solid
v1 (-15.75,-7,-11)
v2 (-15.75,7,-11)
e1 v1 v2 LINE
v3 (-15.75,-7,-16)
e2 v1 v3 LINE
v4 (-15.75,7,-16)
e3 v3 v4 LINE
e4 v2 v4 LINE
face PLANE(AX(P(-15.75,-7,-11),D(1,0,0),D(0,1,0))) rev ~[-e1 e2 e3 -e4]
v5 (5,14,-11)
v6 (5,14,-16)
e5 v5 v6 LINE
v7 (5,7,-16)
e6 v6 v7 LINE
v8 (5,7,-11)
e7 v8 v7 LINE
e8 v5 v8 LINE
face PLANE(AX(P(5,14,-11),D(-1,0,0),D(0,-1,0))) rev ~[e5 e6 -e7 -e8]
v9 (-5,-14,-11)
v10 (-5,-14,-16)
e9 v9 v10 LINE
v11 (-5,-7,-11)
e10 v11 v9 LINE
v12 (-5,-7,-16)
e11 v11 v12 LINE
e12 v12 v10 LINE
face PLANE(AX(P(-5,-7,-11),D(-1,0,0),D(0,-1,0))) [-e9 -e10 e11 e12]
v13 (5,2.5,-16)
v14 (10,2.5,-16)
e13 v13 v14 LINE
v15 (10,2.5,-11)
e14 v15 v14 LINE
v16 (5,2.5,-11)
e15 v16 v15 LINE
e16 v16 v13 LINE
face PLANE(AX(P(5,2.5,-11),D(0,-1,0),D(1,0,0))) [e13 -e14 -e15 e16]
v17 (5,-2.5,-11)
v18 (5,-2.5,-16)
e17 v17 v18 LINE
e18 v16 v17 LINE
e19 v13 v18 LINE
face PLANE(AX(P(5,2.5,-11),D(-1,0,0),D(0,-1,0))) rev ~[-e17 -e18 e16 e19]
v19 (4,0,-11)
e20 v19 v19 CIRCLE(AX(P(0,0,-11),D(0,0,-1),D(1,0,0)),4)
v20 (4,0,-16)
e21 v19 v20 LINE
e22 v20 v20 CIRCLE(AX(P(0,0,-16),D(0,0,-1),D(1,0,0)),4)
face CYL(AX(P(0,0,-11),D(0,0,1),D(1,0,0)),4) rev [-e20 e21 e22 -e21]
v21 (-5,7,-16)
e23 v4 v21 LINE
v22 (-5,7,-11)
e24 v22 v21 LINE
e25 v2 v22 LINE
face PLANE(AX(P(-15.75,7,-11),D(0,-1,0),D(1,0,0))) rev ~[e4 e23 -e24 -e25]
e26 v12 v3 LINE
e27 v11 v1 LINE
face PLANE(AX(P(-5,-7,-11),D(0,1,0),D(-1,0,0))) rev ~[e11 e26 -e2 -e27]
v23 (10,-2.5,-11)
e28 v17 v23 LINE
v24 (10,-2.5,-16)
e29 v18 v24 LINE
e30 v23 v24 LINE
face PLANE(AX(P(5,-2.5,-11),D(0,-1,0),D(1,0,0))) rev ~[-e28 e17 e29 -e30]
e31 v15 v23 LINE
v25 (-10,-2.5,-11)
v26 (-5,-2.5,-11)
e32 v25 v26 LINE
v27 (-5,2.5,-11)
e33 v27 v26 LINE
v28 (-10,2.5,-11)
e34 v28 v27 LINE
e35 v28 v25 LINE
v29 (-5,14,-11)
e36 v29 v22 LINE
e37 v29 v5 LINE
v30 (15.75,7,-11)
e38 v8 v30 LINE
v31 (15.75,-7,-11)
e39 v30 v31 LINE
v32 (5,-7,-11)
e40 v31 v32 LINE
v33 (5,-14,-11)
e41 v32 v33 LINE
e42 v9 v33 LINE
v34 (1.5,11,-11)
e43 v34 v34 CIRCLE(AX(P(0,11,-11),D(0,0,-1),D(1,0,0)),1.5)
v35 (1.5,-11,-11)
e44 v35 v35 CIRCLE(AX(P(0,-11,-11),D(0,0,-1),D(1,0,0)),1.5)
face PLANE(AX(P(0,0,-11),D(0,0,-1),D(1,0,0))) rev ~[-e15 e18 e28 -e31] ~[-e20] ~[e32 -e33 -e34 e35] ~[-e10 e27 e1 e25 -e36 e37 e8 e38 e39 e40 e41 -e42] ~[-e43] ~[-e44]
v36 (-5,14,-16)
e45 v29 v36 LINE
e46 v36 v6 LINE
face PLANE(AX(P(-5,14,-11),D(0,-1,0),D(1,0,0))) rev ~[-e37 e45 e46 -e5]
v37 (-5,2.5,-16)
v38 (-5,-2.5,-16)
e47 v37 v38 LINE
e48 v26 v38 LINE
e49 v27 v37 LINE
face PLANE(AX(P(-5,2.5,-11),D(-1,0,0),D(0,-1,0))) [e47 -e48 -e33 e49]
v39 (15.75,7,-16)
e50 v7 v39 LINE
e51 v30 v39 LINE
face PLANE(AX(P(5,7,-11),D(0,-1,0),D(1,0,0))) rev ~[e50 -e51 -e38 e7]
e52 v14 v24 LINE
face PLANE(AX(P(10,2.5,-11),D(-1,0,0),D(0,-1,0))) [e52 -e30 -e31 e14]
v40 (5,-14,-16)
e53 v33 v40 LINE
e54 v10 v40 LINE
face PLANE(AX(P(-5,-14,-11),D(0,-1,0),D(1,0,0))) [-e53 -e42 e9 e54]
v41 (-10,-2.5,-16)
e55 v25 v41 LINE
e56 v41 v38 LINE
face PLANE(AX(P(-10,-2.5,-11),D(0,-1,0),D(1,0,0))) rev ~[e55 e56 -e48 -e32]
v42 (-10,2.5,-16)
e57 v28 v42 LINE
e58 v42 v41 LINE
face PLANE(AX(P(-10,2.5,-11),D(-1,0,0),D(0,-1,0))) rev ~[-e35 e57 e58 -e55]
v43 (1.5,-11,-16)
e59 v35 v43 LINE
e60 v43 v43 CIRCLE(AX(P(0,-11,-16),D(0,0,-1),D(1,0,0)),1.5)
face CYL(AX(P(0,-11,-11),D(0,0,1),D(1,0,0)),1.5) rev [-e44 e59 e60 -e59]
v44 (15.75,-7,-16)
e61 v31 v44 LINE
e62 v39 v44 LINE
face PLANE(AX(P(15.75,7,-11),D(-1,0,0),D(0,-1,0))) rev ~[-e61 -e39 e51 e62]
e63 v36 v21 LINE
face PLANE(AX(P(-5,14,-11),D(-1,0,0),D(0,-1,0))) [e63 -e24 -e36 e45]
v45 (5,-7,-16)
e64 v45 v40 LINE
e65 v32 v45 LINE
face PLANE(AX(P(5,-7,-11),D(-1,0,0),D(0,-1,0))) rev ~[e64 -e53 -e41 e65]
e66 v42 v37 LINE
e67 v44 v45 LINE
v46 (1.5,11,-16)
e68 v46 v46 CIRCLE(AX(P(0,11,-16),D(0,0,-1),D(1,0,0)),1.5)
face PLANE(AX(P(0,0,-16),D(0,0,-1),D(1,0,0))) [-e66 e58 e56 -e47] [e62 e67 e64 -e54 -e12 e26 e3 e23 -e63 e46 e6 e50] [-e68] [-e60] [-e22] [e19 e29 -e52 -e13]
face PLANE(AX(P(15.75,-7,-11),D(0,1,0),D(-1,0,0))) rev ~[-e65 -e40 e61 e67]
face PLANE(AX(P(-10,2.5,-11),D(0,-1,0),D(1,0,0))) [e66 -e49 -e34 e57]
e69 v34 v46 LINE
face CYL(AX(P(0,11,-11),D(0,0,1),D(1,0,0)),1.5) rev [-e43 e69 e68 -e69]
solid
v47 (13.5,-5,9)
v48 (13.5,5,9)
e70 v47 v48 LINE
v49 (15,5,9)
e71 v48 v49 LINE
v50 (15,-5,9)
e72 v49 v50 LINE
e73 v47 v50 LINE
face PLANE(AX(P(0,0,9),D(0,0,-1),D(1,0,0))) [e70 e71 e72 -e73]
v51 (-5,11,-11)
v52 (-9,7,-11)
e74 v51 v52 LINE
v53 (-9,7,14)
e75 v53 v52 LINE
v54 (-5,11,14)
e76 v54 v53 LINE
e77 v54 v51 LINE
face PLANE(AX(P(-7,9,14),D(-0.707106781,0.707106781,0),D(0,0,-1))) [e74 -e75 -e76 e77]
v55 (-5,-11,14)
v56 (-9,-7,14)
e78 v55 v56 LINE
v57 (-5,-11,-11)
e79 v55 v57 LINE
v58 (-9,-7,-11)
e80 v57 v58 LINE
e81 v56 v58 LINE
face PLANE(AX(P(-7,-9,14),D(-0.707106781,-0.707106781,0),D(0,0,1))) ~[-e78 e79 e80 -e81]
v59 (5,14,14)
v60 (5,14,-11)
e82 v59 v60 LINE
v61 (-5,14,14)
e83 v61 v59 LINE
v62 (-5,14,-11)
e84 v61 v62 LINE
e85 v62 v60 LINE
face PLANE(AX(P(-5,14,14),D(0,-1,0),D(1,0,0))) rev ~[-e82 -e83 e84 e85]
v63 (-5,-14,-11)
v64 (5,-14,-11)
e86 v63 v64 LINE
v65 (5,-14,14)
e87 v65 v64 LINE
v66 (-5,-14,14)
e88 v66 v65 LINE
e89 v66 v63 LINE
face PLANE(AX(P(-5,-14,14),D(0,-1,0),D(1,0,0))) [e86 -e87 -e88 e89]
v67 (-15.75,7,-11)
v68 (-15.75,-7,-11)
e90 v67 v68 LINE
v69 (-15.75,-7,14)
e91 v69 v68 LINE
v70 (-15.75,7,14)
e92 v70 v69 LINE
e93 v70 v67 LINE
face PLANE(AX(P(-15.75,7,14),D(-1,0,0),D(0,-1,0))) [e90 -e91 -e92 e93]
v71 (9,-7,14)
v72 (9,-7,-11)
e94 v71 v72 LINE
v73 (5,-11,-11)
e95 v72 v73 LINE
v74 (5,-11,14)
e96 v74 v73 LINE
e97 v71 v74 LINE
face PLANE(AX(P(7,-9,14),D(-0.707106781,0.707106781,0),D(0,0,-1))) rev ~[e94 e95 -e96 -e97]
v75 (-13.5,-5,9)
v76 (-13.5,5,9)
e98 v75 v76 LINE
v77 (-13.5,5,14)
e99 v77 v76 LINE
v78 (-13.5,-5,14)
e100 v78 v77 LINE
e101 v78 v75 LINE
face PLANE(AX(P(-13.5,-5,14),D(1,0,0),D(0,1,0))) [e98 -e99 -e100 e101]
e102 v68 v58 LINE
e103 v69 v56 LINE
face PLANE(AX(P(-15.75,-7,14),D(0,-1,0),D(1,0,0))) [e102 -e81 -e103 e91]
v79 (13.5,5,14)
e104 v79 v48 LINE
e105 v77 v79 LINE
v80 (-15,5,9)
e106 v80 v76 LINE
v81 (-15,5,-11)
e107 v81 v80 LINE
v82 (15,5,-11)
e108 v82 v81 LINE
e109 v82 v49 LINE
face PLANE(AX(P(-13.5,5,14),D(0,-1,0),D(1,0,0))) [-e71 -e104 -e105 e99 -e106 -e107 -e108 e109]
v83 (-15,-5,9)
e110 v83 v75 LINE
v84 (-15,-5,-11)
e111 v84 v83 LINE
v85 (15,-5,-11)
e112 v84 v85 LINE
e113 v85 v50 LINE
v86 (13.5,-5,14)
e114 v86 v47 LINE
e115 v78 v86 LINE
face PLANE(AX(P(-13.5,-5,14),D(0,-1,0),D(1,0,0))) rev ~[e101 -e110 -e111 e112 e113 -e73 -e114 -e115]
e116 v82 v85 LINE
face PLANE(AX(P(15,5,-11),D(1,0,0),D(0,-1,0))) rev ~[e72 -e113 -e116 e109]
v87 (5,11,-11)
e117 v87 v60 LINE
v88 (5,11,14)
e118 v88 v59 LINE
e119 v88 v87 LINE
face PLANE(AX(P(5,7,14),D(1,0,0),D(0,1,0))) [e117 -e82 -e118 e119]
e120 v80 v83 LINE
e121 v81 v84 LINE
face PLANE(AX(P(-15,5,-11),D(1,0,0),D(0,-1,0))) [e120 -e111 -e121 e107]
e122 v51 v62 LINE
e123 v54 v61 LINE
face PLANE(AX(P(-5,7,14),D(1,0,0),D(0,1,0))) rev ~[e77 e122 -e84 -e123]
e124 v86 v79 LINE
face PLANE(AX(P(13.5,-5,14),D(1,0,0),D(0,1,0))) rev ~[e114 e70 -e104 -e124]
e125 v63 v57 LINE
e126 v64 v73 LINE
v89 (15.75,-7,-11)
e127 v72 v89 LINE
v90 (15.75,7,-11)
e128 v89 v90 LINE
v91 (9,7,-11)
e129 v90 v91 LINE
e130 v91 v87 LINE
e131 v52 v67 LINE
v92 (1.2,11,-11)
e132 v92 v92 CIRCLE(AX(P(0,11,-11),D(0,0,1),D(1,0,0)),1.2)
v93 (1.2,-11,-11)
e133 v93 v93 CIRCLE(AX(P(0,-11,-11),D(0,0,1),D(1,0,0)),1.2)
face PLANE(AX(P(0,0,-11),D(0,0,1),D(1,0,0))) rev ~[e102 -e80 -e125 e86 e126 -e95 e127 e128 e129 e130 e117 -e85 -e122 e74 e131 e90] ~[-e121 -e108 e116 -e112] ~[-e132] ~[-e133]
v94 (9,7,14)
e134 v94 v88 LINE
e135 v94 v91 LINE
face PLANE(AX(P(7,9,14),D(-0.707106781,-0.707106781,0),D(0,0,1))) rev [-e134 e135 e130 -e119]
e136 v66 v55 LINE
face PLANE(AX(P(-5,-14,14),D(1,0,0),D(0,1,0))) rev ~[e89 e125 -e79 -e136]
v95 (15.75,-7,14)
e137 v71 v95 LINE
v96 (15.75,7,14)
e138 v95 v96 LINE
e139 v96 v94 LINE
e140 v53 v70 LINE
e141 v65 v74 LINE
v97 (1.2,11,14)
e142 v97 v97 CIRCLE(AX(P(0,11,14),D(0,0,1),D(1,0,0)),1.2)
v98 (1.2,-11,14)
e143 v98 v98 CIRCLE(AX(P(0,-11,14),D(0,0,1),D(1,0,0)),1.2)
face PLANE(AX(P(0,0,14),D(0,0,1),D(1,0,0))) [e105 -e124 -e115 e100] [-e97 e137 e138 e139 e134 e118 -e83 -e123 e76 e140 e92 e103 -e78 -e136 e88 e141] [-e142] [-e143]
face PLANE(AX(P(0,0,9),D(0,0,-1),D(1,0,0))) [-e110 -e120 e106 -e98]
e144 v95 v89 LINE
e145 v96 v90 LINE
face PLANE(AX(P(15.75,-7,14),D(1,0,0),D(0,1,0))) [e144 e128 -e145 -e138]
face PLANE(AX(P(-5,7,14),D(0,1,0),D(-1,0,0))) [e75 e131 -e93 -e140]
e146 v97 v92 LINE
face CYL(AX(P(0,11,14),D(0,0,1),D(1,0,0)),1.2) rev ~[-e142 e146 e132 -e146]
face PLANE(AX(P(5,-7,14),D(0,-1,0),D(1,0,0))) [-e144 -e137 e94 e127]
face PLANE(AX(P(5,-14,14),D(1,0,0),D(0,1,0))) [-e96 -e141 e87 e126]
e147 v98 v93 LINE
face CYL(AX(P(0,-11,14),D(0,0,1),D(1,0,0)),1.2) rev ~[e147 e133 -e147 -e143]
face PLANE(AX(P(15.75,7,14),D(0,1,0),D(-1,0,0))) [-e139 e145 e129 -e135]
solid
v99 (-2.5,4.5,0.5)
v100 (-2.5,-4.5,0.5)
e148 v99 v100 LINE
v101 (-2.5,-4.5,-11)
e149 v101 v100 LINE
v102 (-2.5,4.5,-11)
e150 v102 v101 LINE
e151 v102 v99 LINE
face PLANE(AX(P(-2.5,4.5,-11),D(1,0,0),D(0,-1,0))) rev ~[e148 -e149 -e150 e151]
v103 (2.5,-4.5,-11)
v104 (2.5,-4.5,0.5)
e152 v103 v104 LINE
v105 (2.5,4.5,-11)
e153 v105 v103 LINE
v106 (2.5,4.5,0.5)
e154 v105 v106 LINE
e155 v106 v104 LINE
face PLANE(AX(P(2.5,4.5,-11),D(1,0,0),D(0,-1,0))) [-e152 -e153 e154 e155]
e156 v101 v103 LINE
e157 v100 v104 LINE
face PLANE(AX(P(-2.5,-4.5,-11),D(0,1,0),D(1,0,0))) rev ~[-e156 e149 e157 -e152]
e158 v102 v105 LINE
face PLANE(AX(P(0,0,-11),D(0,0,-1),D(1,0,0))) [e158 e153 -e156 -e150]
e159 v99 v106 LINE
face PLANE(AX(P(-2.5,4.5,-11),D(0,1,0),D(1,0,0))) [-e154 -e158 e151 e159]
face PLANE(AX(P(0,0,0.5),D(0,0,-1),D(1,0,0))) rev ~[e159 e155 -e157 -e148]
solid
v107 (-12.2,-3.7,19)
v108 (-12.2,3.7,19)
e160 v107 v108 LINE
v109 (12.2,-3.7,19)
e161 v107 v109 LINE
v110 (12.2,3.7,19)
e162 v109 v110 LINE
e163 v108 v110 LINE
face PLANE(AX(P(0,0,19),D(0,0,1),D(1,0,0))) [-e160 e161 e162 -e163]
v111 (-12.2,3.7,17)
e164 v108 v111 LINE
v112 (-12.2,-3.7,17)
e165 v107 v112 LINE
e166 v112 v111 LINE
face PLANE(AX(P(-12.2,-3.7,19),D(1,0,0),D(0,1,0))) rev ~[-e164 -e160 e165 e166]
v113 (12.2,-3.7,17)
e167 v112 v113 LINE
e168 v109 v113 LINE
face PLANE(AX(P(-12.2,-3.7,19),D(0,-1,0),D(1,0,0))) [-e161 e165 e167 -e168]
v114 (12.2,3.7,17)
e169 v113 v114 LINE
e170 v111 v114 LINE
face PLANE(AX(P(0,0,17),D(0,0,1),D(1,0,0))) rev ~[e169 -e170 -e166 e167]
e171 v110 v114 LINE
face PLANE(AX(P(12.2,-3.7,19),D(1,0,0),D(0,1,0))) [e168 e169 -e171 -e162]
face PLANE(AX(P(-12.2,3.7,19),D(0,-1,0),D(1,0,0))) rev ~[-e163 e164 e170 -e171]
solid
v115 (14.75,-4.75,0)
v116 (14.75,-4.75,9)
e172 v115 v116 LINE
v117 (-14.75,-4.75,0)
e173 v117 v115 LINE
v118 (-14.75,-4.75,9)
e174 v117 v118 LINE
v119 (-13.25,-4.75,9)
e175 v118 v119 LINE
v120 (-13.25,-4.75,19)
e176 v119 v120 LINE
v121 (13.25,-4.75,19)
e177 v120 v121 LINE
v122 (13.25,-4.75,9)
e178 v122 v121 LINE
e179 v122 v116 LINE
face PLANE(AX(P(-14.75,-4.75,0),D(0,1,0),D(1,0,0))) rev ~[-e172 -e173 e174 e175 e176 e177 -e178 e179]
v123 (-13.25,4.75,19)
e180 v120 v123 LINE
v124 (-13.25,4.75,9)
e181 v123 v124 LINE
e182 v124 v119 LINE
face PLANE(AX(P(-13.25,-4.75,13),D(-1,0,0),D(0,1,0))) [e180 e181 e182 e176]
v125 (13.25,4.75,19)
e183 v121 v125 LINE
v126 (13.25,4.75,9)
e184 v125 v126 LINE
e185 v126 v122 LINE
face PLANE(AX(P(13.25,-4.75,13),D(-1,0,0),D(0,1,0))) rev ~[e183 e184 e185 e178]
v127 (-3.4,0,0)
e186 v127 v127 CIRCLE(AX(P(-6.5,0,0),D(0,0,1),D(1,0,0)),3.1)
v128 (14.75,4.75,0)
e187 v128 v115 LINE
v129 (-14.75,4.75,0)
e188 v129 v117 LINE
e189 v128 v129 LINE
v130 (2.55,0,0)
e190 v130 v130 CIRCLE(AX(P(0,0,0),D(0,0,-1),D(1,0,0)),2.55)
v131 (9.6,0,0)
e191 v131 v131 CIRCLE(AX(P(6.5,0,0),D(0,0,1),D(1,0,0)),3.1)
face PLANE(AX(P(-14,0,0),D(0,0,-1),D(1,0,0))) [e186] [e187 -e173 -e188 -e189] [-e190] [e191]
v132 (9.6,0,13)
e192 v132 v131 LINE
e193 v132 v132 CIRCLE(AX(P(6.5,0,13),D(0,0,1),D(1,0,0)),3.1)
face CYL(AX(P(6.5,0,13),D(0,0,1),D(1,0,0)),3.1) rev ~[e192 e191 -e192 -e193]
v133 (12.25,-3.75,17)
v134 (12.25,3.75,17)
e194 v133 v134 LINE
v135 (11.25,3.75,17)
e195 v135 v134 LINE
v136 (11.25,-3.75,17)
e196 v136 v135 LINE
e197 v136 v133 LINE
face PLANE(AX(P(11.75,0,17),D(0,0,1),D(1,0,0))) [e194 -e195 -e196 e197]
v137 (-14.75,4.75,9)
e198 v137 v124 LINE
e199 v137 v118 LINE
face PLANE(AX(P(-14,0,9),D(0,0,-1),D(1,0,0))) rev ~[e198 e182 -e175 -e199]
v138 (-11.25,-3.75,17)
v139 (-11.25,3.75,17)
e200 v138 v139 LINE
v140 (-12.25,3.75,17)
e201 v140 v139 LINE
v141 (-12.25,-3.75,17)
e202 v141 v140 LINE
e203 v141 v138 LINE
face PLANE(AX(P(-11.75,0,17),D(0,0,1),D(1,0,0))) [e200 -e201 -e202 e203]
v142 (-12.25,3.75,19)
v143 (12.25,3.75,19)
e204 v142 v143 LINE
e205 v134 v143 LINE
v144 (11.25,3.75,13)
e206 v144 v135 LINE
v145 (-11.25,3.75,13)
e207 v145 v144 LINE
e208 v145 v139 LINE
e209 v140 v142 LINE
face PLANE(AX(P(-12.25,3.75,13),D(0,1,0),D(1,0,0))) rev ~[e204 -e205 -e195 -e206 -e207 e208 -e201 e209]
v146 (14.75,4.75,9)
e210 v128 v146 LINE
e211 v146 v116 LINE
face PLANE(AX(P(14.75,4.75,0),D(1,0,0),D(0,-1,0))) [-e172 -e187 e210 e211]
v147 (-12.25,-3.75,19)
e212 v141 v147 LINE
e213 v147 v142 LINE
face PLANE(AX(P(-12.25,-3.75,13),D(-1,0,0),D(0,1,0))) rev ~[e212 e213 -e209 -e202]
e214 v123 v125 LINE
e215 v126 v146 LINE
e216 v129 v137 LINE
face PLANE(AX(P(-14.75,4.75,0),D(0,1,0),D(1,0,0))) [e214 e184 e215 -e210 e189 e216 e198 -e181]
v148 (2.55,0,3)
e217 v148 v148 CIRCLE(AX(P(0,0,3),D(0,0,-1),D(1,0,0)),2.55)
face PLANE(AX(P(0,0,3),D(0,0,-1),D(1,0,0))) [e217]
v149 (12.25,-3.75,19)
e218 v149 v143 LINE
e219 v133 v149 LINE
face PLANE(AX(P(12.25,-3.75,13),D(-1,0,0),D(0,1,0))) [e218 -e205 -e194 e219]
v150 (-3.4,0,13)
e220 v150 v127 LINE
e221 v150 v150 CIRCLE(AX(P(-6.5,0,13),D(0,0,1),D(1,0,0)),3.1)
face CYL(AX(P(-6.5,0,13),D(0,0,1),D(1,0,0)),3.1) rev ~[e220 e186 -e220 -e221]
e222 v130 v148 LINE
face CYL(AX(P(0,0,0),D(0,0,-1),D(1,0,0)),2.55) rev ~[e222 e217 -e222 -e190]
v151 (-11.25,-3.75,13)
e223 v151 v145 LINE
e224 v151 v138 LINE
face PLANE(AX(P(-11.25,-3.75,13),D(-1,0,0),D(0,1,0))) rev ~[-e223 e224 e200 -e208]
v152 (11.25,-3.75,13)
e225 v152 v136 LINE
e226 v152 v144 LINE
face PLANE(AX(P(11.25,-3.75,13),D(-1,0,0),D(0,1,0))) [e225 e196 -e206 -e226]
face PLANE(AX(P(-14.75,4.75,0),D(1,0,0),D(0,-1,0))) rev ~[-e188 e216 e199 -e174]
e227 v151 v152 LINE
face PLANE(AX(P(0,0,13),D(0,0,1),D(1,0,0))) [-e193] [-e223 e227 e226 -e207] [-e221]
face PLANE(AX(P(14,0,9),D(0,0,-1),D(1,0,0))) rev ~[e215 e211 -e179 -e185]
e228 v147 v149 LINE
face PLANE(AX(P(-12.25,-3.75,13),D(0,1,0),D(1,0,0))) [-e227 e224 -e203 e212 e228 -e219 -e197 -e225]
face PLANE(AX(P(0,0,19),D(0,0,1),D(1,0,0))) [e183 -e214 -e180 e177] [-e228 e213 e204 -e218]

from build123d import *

# Parameters (mm, degrees)
F0_W      = 26.5
F0_H      = 9.5
F1_DEPTH  = 13
F2_W      = 26.5
F2_H      = 9.5
F2_W_2    = 24.5
F2_H_2    = 7.5
F3_DEPTH  = 6
F4_W      = 1
F4_H      = 7.5
F5_DEPTH  = 4
F6_R      = 3.1
F7_DEPTH  = 19
F8_W      = 1.5
F8_H      = 9.5
F9_DEPTH  = 9
F10_R     = 2.55
F11_DEPTH = 3
F13_W     = 27
F13_H     = 10
F13_W_2   = 10
F13_H_2   = 7
F14_DEPTH = 25
F15_W     = 30
F15_H     = 10
F16_DEPTH = 20
F17_R     = 1.2
F18_DEPTH = 25
F19_W     = 5
F19_H     = 5
F19_R     = 4
F19_W_2   = 10
F19_H_2   = 7
F19_R_2   = 1.5
F20_DEPTH = 5
F21_SIZE  = 4
F23_W     = 5
F23_H     = 9
F24_DEPTH = 11.5
F25_W     = 24.4
F25_H     = 7.4
F26_DEPTH = 2


with BuildPart() as f1:
    # F0 (on Top) → F1 (new body)
    with BuildSketch(Plane.XY):
        Rectangle(F0_W, F0_H)
    extrude(amount=F1_DEPTH)

    # F2 (on face) → F3 (join)
    with BuildSketch(Plane.XY.offset(13)):
        Rectangle(F2_W, F2_H)
        Rectangle(F2_W_2, F2_H_2, mode=Mode.SUBTRACT)
    extrude(amount=F3_DEPTH)

    # F4 (on face) → F5 (join)
    with BuildSketch(Plane.XY.offset(13)):
        with Locations((-11.75, 0)):
            Rectangle(F4_W, F4_H)
        with Locations((11.75, 0)):
            Rectangle(F4_W, F4_H)
    extrude(amount=F5_DEPTH)

    # F6 (on face) → F7 (cut)
    with BuildSketch(Plane.XY.offset(13)):
        with Locations((-6.5, 0)):
            Circle(F6_R)
        with Locations((6.5, 0)):
            Circle(F6_R)
    extrude(amount=-F7_DEPTH, mode=Mode.SUBTRACT)

    # F8 (on face) → F9 (join)
    with BuildSketch(Plane(origin=(0, 0, 0), x_dir=(1, 0, 0), z_dir=(0, 0, -1))):
        with Locations((-14, 0)):
            Rectangle(F8_W, F8_H)
        with Locations((14, 0)):
            Rectangle(F8_W, F8_H)
    extrude(amount=-F9_DEPTH)

    # F10 (on face) → F11 (cut)
    with BuildSketch(Plane(origin=(0, 0, 0), x_dir=(1, 0, 0), z_dir=(0, 0, -1))):
        Circle(F10_R)
    extrude(amount=-F11_DEPTH, mode=Mode.SUBTRACT)


with BuildPart() as f14:
    # F13 (on offset) → F14 (new body)
    with BuildSketch(Plane.XY.offset(14)):
        Polygon((5, -7), (15.75, -7), (15.75, 7), (5, 7), (-5, 7), (-15.75, 7), (-15.75, -7), (-5, -7), align=None)
        Rectangle(F13_W, F13_H, mode=Mode.SUBTRACT)
        with Locations((0, -10.5)):
            Rectangle(F13_W_2, F13_H_2)
        with Locations((0, 10.5)):
            Rectangle(F13_W_2, F13_H_2)
    extrude(amount=-F14_DEPTH)

    # F15 (on face) → F16 (cut)
    with BuildSketch(Plane(origin=(0, 0, -11), x_dir=(1, 0, 0), z_dir=(0, 0, -1))):
        Rectangle(F15_W, F15_H)
    extrude(amount=-F16_DEPTH, mode=Mode.SUBTRACT)

    # F17 (on face) → F18 (cut)
    with BuildSketch(Plane.XY.offset(14)):
        with Locations((0, 11)):
            Circle(F17_R)
        with Locations((0, -11)):
            Circle(F17_R)
    extrude(amount=-F18_DEPTH, mode=Mode.SUBTRACT)

    # F21
    f21_edges = [f14.edges().sort_by_distance(p)[0] for p in [
        (-5, 7, 1.5),
        (5, 7, 1.5),
        (5, -7, 1.5),
        (-5, -7, 1.5),
    ]]
    chamfer(f21_edges, length=F21_SIZE)


with BuildPart() as f20:
    # F19 (on face) → F20 (new body)
    with BuildSketch(Plane(origin=(0, 0, -11), x_dir=(1, 0, 0), z_dir=(0, 0, -1))):
        Polygon((5, -7), (15.75, -7), (15.75, 7), (5, 7), (-5, 7), (-15.75, 7), (-15.75, -7), (-5, -7), align=None)
        with Locations((-7.5, 0)):
            Rectangle(F19_W, F19_H, mode=Mode.SUBTRACT)
        Circle(F19_R, mode=Mode.SUBTRACT)
        with Locations((7.5, 0)):
            Rectangle(F19_W, F19_H, mode=Mode.SUBTRACT)
        with Locations((0, -10.5)):
            Rectangle(F19_W_2, F19_H_2)
        with Locations((0, -11)):
            Circle(F19_R_2, mode=Mode.SUBTRACT)
        with Locations((0, 10.5)):
            Rectangle(F19_W_2, F19_H_2)
        with Locations((0, 11)):
            Circle(F19_R_2, mode=Mode.SUBTRACT)
    extrude(amount=F20_DEPTH)


with BuildPart() as f24:
    # F23 (on offset) → F24 (new body)
    with BuildSketch(Plane(origin=(0, 0, -11), x_dir=(1, 0, 0), z_dir=(0, 0, -1))):
        Rectangle(F23_W, F23_H)
    extrude(amount=-F24_DEPTH)


with BuildPart() as f26:
    # F25 (on face) → F26 (new body)
    with BuildSketch(Plane.XY.offset(19)):
        Rectangle(F25_W, F25_H)
    extrude(amount=-F26_DEPTH)


solid = Compound([f1.part, f14.part, f20.part, f24.part, f26.part])
